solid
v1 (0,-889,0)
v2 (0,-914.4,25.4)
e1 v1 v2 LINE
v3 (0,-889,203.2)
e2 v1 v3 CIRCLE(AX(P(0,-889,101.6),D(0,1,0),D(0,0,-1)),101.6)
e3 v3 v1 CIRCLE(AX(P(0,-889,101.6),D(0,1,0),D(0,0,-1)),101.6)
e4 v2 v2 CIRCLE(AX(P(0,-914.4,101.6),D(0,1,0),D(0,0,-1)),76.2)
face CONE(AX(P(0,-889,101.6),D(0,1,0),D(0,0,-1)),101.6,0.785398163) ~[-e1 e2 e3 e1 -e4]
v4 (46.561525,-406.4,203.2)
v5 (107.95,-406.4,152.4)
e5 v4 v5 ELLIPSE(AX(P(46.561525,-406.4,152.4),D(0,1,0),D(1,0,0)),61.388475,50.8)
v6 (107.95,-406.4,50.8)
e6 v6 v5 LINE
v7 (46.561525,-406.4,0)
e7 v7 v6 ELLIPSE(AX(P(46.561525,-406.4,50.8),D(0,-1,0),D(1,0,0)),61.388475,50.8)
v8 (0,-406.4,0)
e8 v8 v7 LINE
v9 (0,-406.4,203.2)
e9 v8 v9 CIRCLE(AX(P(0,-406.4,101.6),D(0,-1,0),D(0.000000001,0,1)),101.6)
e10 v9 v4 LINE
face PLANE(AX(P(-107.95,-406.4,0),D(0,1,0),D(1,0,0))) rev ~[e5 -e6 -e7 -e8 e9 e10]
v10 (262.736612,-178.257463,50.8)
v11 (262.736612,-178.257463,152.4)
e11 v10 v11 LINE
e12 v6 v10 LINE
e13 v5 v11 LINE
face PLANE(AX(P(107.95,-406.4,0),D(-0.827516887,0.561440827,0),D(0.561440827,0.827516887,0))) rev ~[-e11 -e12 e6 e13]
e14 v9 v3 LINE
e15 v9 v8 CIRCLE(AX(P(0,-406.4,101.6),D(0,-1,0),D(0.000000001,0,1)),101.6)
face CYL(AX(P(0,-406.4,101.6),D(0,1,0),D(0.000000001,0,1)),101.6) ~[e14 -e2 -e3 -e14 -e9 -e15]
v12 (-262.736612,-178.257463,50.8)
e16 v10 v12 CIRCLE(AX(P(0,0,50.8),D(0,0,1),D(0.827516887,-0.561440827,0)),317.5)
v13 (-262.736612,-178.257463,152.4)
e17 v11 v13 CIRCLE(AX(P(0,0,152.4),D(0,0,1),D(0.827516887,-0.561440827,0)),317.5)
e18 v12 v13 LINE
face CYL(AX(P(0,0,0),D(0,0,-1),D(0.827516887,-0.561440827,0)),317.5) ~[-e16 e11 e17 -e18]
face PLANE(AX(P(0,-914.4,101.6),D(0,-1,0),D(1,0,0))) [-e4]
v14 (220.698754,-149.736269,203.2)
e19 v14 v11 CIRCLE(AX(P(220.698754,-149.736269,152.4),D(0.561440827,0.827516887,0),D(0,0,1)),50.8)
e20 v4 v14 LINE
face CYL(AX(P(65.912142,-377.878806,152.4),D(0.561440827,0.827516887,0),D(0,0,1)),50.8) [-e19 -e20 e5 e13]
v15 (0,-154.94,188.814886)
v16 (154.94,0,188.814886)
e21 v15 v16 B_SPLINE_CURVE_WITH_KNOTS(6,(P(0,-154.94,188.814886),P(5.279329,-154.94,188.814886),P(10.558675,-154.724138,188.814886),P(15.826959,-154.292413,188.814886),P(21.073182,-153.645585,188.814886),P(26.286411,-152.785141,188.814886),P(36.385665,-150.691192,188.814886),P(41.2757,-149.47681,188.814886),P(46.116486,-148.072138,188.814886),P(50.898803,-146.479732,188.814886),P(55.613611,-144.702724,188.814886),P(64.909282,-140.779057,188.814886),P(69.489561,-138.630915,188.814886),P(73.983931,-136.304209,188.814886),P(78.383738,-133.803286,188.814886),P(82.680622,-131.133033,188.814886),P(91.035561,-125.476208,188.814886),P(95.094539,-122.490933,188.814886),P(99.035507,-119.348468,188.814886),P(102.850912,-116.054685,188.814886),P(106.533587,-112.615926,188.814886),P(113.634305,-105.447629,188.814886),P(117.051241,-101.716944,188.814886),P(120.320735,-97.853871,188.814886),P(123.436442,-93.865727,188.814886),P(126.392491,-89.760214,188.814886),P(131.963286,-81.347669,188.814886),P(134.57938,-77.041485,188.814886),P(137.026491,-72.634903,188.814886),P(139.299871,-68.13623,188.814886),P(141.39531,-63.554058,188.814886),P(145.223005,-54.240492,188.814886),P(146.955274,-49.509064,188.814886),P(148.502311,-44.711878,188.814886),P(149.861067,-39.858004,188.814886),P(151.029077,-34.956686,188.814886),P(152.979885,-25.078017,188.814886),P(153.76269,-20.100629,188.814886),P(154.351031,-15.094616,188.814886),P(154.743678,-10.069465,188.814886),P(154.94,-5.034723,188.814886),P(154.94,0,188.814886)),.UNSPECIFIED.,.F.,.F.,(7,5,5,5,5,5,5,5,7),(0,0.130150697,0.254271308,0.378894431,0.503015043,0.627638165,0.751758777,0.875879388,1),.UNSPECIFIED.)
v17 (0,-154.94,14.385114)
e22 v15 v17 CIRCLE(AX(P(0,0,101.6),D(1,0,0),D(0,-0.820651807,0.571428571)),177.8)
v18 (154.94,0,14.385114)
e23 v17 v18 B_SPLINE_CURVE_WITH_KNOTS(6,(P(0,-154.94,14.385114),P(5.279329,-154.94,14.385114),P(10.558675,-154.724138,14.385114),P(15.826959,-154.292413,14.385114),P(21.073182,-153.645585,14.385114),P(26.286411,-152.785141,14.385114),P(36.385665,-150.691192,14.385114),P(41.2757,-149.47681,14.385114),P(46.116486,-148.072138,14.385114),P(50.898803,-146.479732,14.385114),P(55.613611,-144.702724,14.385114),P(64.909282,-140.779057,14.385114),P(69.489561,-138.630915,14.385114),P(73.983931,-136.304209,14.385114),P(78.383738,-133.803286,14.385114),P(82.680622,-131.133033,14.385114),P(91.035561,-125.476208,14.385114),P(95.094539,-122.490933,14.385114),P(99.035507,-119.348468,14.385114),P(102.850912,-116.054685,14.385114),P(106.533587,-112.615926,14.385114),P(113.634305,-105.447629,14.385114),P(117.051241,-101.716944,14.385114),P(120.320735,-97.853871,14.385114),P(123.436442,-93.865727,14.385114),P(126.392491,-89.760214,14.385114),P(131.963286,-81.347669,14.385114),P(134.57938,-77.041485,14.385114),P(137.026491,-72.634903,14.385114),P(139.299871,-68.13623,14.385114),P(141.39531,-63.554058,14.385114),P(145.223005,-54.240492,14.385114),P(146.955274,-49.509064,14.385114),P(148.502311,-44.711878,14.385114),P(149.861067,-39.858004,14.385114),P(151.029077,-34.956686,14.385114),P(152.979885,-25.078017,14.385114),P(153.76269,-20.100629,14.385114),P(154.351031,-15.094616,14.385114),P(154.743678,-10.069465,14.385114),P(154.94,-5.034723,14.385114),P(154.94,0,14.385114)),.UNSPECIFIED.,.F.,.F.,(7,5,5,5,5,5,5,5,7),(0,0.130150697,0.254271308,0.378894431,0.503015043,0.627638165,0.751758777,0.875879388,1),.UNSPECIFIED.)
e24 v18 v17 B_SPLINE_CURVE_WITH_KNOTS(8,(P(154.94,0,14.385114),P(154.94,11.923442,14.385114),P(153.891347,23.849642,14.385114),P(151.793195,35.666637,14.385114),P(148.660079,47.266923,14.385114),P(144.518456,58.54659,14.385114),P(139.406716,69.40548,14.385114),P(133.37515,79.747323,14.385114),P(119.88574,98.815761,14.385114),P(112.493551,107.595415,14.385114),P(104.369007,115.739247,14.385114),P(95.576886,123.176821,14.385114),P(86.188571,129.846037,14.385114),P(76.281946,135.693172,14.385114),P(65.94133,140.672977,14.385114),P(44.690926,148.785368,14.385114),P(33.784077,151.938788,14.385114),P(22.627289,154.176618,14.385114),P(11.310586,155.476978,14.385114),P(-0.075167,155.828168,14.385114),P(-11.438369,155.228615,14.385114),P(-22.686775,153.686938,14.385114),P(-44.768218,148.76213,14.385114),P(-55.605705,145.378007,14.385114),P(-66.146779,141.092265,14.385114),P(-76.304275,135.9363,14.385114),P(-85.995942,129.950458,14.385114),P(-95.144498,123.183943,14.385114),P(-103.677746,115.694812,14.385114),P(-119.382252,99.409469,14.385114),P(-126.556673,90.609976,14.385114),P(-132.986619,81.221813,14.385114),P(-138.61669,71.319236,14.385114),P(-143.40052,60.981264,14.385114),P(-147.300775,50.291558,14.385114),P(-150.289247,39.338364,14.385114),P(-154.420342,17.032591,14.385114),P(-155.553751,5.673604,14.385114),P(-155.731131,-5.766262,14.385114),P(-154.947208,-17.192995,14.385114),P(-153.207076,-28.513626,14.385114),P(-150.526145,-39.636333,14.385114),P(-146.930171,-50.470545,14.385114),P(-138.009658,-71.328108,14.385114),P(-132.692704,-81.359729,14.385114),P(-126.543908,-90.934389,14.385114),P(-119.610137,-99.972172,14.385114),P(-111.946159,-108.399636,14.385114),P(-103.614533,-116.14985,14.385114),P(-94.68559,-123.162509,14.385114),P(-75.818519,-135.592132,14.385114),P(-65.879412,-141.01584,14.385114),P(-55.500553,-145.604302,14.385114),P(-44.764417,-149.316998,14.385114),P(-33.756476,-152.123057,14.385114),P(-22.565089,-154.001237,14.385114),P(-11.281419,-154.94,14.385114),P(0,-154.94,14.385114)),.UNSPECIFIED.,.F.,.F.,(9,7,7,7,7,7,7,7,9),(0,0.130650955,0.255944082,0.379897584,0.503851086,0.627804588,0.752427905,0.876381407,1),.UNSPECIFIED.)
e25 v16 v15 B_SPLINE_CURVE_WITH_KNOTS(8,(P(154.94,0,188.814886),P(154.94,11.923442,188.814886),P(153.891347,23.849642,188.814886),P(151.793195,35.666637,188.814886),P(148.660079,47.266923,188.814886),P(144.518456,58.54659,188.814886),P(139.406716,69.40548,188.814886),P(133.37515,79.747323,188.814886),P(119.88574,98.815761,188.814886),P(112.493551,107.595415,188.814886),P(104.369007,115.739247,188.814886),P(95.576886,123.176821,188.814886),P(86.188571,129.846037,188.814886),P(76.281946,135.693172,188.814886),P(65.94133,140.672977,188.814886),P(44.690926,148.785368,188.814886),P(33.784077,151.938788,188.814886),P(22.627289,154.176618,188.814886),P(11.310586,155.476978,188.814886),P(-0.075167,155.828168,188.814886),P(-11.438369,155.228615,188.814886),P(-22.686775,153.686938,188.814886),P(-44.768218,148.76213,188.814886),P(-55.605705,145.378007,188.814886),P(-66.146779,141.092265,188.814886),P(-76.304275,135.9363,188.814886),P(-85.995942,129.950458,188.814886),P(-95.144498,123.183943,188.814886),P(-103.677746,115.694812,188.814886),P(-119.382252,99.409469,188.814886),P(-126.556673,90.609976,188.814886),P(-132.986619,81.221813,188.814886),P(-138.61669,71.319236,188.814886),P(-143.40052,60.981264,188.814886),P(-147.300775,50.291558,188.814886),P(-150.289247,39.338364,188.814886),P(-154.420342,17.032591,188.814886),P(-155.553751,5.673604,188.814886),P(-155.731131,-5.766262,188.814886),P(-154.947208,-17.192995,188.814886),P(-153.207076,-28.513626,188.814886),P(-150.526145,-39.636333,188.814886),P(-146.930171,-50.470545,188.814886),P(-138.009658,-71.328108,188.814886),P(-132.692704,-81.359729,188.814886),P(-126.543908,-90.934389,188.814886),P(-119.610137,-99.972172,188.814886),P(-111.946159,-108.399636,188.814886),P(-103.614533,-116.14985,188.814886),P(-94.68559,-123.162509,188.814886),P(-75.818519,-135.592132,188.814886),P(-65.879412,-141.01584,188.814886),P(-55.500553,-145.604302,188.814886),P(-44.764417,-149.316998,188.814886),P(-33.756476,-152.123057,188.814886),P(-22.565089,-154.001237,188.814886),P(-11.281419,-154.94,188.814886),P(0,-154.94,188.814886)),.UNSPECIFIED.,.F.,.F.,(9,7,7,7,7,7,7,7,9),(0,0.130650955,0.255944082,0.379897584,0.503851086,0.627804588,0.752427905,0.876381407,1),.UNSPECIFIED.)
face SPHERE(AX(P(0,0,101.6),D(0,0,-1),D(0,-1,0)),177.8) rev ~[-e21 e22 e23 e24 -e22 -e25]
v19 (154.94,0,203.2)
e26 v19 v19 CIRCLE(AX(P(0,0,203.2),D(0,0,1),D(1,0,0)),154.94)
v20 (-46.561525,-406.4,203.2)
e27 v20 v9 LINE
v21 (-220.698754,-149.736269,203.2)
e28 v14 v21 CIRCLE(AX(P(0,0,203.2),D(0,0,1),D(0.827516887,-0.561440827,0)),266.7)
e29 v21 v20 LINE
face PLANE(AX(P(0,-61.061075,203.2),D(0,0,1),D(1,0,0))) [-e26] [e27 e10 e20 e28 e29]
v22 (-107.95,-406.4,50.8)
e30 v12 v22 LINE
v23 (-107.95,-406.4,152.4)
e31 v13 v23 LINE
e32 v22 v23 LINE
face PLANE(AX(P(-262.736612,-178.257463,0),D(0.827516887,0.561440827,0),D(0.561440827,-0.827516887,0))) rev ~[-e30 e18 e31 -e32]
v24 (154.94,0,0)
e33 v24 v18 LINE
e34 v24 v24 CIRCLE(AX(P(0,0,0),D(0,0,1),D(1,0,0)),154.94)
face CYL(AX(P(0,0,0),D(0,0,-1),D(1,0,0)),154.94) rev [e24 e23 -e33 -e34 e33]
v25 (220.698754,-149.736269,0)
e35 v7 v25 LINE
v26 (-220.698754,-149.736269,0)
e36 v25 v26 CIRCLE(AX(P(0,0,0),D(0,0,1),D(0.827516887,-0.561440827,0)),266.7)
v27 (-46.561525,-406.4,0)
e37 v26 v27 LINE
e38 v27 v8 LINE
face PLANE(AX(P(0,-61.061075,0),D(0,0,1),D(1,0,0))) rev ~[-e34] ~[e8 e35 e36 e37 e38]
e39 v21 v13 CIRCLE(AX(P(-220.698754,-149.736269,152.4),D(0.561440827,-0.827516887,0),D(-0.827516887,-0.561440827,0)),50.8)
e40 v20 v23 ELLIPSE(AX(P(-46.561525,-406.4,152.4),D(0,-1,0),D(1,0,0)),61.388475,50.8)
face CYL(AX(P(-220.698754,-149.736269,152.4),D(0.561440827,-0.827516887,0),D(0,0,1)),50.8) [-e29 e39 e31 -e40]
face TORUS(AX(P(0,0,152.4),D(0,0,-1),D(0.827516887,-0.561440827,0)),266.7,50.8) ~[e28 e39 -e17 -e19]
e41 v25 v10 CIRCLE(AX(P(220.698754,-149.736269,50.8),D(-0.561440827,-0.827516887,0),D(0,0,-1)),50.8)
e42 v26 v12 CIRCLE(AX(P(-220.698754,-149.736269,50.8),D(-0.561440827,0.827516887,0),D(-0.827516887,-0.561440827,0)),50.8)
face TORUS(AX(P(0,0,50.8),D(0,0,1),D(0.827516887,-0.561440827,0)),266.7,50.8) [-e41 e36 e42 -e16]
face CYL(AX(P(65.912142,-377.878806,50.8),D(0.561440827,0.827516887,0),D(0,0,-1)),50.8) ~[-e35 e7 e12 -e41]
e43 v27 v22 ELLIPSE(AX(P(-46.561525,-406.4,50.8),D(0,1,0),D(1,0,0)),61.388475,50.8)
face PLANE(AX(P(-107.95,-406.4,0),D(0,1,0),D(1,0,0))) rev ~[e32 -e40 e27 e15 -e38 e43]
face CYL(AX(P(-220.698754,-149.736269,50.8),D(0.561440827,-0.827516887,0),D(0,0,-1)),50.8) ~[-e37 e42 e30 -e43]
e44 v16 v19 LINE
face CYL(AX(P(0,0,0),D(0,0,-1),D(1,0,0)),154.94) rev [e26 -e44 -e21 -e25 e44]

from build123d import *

# Parameters (mm, degrees)
F0_R     = 154.94
F1_DEPTH = 203.2
F3_DEPTH = 508
F6_R     = 50.8


# Not quite as in the source:
# - a fillet or chamfer that OpenCascade refuses, or shapes differently, is made with other operations: its cross-section is extruded or revolved along the edge and cut away or added


with BuildPart() as f1:
    # F0 (on Top) → F1 (new body)
    with BuildSketch(Plane.XY):
        with BuildLine():
            Line((107.95, -406.4), (262.736611536, -178.2574625608))
            ThreePointArc((262.736611536, -178.2574625608), (0, 317.5), (-262.736611536, -178.2574625608))
            Line((-262.736611536, -178.2574625608), (-107.95, -406.4))
            Line((-107.95, -406.4), (0, -406.4))
            Line((0, -406.4), (107.95, -406.4))
        make_face()
        Circle(F0_R, mode=Mode.SUBTRACT)
    extrude(amount=F1_DEPTH)

    # F2 (on face) → F3 (join)
    with BuildSketch(Plane.XZ.offset(406.4)):
        with BuildLine():
            ThreePointArc((-6.5e-08, 0), (71.8420489456, 29.7579510085), (101.6, 101.6))
            ThreePointArc((101.6, 101.6), (71.8420489961, 173.442048941), (7.8e-08, 203.2))
            ThreePointArc((7.8e-08, 203.2), (-101.6, 101.6000000715), (-6.5e-08, 0))
        make_face()
    extrude(amount=F3_DEPTH)

    # F4 (on Right) → F5 (revolve, cut)
    with BuildSketch(Plane.YZ):
        with BuildLine():
            Line((0, 203.2), (-145.9118912221, 203.2))
            ThreePointArc((-145.9118912221, 203.2), (-177.8, 101.6), (-145.9118912221, 0))
            Line((-145.9118912221, 0), (0, 0))
            Line((0, 0), (0, 203.2))
        make_face()
    revolve(axis=Axis((0, 0, 101.6), (0, 0, -1)), mode=Mode.SUBTRACT)

    # F6
    f6_edges = [f1.edges().sort_by_distance(p)[0] for p in [
        (262.736612, -178.257463, 101.6),
        (-262.736612, -178.257463, 101.6),
        (0, 317.5, 0),
        (0, 317.5, 203.2),
        (-185.343306, -292.328731, 0),
        (-185.343306, -292.328731, 203.2),
        (185.343306, -292.328731, 0),
        (185.343306, -292.328731, 203.2),
    ]]
    fillet(f6_edges, radius=F6_R)

    # F7: chamfer of 25.4 on 1 edges, made by hand

    # F7_s1 → F7_t2 (revolve, cut)
    with BuildSketch(Plane.YZ):
        Polygon((-889, 0), (-914.4, 25.4), (-914.4, 0), align=None)
    revolve(axis=Axis((0, -914.4, 101.6), (0, 1, 0)), mode=Mode.SUBTRACT)


solid = f1.part
